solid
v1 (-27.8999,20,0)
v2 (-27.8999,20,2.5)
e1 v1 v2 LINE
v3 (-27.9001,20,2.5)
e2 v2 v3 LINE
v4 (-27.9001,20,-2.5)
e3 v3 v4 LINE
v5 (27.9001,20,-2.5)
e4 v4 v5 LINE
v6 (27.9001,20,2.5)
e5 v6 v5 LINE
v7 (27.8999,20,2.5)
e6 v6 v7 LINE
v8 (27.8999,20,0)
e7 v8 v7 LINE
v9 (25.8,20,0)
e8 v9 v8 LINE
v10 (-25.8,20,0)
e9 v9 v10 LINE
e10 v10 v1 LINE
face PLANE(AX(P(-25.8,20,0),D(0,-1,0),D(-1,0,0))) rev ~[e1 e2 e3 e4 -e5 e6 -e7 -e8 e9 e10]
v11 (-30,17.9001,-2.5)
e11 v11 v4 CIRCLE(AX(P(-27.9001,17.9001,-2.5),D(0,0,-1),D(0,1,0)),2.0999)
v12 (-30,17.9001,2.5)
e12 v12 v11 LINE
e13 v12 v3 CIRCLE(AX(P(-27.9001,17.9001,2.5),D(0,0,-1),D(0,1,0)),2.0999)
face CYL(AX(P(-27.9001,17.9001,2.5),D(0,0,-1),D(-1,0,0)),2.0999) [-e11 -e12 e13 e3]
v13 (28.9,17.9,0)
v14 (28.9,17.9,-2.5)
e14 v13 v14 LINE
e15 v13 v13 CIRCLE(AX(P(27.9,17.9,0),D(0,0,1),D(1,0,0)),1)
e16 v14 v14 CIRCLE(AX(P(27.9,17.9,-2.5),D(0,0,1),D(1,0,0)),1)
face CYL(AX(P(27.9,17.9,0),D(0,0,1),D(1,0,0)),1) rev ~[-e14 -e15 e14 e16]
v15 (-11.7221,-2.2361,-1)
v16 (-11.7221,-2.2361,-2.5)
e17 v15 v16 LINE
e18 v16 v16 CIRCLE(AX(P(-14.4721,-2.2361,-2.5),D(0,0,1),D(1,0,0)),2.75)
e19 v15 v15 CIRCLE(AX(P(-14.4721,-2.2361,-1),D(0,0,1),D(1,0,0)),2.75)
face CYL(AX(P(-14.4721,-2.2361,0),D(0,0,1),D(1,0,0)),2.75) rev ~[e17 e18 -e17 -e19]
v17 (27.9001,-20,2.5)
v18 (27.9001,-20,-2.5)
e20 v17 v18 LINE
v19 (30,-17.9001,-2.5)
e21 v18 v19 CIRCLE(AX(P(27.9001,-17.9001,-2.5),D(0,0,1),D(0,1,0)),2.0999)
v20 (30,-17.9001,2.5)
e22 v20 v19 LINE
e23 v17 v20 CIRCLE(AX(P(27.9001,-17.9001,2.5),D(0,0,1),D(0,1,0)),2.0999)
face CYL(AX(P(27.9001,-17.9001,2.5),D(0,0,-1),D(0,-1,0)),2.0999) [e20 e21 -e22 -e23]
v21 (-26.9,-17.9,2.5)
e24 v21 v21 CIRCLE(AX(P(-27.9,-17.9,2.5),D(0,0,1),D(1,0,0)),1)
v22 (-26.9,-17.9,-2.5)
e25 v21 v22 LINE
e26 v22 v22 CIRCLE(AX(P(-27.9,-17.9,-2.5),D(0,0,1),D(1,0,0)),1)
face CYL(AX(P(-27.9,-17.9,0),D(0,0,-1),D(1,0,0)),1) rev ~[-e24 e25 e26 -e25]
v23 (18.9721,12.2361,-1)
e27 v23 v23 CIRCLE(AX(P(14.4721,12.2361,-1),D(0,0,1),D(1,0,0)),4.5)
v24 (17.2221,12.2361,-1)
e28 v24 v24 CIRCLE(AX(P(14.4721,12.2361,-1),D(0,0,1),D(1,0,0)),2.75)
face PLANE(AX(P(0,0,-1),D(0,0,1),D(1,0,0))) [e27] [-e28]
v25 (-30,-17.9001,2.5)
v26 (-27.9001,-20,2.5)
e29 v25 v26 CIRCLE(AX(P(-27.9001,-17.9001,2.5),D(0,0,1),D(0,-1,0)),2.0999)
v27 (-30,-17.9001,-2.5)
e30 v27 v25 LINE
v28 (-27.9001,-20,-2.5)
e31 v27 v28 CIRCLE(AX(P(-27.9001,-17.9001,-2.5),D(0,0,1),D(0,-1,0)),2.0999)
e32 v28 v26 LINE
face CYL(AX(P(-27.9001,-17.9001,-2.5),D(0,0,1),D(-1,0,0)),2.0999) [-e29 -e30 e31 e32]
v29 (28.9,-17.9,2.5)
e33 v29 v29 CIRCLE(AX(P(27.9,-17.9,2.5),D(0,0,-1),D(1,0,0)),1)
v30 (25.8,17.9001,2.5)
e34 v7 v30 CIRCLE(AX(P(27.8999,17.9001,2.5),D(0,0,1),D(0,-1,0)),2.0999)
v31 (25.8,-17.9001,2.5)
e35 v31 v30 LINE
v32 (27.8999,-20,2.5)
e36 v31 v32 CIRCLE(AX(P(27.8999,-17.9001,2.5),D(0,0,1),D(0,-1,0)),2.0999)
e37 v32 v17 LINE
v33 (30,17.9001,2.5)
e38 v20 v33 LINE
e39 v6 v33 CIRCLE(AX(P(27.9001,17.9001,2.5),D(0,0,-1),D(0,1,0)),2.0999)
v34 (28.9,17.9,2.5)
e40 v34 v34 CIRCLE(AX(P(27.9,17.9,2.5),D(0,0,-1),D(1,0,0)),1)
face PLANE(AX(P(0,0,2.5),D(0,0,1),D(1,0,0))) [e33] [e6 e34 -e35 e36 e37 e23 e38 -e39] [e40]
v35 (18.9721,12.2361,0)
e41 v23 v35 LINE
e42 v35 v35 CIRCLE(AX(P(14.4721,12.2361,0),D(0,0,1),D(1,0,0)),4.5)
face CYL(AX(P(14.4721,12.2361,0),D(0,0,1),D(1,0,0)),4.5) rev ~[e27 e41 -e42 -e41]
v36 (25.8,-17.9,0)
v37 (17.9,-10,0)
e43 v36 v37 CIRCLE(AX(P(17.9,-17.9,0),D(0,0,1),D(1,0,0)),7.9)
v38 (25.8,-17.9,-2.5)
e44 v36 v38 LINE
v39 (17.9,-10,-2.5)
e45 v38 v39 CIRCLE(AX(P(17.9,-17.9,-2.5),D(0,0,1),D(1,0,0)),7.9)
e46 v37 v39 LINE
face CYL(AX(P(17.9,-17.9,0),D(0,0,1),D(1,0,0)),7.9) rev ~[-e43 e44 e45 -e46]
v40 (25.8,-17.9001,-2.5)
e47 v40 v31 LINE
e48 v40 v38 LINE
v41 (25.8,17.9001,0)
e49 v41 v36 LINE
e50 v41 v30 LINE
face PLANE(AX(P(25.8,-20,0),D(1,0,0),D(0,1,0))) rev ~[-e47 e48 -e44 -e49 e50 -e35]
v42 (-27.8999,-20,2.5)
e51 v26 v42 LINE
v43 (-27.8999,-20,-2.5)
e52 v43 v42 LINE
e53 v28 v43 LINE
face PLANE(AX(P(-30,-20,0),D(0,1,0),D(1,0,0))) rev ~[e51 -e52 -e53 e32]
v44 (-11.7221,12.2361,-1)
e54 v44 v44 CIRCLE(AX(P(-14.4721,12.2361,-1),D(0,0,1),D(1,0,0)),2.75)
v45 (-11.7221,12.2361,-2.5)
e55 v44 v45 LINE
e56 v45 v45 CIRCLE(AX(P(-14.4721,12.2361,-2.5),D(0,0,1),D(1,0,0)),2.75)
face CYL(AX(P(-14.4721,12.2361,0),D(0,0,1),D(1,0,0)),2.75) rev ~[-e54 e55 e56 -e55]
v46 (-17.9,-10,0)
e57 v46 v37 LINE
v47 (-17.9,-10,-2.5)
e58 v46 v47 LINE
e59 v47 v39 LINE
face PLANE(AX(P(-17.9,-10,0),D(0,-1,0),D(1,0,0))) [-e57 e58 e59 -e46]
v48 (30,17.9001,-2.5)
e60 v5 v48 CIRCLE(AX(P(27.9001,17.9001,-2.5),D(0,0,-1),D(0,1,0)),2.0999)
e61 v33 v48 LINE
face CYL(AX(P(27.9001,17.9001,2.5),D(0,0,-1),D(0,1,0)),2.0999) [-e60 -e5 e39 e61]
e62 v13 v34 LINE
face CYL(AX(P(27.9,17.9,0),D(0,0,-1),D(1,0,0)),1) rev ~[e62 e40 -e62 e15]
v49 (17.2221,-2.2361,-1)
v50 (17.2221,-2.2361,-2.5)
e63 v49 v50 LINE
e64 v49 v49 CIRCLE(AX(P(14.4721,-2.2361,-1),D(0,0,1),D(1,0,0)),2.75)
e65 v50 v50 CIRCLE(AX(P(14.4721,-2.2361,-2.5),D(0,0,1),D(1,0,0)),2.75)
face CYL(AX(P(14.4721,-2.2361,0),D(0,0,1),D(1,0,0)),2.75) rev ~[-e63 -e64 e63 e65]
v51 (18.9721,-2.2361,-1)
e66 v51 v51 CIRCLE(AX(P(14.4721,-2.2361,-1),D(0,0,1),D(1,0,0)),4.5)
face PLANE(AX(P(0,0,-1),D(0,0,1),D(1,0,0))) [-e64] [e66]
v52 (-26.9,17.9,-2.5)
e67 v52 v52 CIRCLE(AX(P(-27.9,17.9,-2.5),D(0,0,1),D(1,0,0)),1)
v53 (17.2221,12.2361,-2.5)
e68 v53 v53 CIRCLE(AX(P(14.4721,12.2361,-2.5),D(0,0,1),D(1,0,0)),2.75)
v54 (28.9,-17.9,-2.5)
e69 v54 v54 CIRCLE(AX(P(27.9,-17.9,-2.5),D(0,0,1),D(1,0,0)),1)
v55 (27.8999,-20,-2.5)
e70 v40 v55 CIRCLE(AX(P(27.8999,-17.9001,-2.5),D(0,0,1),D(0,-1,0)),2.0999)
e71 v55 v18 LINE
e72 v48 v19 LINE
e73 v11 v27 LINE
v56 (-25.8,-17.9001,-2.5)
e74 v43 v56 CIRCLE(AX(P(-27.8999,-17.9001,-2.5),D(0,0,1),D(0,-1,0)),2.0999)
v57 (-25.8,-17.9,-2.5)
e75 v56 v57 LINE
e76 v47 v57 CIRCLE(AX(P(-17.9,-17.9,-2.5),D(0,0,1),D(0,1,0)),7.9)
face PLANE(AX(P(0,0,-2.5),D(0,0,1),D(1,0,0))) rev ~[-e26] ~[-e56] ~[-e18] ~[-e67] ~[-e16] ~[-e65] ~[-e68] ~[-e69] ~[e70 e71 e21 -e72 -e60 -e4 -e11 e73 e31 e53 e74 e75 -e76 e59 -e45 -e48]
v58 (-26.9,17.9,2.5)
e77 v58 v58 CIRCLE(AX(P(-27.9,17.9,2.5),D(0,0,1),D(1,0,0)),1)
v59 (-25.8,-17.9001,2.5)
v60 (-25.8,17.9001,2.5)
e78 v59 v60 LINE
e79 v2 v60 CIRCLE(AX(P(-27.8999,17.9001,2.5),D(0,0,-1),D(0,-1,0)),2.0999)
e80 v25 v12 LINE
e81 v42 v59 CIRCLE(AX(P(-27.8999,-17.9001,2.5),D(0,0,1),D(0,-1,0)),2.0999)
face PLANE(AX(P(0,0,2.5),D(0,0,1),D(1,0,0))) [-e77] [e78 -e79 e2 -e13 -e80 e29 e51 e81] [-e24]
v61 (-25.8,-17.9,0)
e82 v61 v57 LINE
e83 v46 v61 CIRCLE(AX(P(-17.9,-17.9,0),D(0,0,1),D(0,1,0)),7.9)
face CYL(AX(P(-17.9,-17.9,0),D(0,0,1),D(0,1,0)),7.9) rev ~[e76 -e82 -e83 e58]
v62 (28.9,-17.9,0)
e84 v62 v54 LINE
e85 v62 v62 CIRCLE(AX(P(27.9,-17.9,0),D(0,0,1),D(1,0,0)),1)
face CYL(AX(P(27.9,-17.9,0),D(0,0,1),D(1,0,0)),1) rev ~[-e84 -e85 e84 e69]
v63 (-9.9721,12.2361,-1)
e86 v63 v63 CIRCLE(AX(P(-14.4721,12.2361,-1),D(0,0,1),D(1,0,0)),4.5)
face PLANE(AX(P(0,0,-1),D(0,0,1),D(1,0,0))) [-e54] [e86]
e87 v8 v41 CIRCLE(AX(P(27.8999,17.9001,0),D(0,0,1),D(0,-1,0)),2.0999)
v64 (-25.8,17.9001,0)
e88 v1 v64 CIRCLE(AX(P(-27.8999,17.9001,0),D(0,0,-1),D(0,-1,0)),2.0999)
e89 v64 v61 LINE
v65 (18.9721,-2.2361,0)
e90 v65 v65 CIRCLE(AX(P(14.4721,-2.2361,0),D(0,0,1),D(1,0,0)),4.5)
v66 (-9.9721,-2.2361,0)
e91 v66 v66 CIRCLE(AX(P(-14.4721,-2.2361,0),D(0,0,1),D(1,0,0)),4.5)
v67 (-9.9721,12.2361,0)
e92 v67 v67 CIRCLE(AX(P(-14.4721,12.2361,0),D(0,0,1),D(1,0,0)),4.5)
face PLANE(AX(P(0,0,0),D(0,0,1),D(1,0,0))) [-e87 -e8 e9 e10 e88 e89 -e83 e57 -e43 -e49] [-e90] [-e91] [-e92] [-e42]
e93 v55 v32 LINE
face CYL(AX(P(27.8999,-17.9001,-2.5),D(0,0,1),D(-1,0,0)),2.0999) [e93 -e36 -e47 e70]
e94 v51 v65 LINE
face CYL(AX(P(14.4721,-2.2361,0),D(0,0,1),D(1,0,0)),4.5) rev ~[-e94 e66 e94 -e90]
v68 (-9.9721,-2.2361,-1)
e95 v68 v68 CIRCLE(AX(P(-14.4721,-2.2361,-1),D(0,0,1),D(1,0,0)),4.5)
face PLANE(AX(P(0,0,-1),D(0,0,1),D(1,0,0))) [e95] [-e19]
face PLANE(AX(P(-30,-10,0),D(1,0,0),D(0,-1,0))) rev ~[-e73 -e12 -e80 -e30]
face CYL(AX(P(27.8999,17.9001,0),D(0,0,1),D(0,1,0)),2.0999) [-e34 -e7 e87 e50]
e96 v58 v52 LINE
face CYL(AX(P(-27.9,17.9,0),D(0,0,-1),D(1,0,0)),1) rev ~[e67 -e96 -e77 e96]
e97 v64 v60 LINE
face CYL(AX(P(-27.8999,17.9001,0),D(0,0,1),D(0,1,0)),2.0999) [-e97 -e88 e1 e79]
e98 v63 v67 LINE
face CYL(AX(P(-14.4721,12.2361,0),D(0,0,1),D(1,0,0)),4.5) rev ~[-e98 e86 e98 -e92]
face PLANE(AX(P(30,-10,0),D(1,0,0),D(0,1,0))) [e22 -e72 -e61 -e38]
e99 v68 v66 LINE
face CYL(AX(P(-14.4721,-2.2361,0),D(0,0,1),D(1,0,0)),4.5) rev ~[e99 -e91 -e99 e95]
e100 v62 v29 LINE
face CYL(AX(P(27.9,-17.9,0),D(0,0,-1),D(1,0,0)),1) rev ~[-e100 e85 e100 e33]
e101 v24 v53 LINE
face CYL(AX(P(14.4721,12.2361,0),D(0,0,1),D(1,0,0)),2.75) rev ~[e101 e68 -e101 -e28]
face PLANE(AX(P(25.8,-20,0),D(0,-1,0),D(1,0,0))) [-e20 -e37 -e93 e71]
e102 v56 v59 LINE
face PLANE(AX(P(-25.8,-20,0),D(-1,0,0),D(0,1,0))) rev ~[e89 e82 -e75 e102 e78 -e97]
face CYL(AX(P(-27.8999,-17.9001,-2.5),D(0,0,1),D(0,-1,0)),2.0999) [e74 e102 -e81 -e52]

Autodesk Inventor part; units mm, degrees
ref_plane "YZ Plane" through (0, 0, 0) normal (1, 0, 0) x (0, 1, 0)
ref_plane "XZ Plane" through (0, 0, 0) normal (0, 1, 0) x (-1, 0, 0)
ref_plane "XY Plane" through (0, 0, 0) normal (0, 0, 1) x (1, 0, 0)
sketch "Sketch1" plane through (0, 0, 0) normal (0, 0, 1) x (1, 0, 0)
  line L0 (-30, -20) -> (30, -20)
  line L1 (30, -20) -> (30, 20)
  line L2 (30, 20) -> (-30, 20)
  line L3 (-30, 20) -> (-30, -20)
  line L4 (-30, -20) -> (30, 20) construction
  line L5 (30, -20) -> (-30, 20) construction
  circle A0 centre (-27.9, 17.9) radius 2.1 construction
  circle A1 centre (-27.9, 17.9) radius 1
  line L6 (0, 0) -> (-34.17, 0) construction
  line L7 (0, 33.0444) -> (0, 0) construction
  circle A2 centre (-27.9, -17.9) radius 1
  circle A3 centre (27.9, 17.9) radius 1
  circle A4 centre (27.9, -17.9) radius 1
  line L8 (-25.8, -20) -> (-25.8, 20)
  line L9 (25.8, -20) -> (25.8, 20)
  line L10 (-27.9, 17.9) -> (27.9, 17.9)
  line L11 (27.9, -17.9) -> (-27.9, -17.9)
  circle A5 centre (-14.4721, 12.2361) radius 2.75
  circle A6 centre (-14.4721, 12.2361) radius 4.5
  circle A7 centre (-14.4721, 12.2361) radius 5 construction
  circle A8 centre (-10, 10) radius 2.5 construction
  line L12 (-34.3347, 5) -> (2.7365, 5) construction
  line L13 (-14.4721, 12.2361) -> (0, 5) construction
  circle A9 centre (-14.4721, -2.2361) radius 2.75
  circle A10 centre (-14.4721, -2.2361) radius 4.5
  circle A11 centre (14.4721, 12.2361) radius 2.75
  circle A12 centre (14.4721, 12.2361) radius 4.5
  circle A13 centre (14.4721, -2.2361) radius 2.75
  circle A14 centre (14.4721, -2.2361) radius 4.5
  line L14 (-30, -10) -> (30, -10)
  arc A15 (-17.9, -10) -> (-25.8, -17.9) centre (-17.9, -17.9) ccw
  arc A16 (25.8, -17.9) -> (17.9, -10) centre (17.9, -17.9) ccw
  point P0 (-25.8, 17.9)
  point P1 (25.8, 17.9)
  point P2 (25.8, 20)
  dimension "d0" = 60
  dimension "d1" = 40
  dimension "d2" = 1.1
  dimension "d3" = 2
  dimension "d8" = 9
  dimension "d9" = 5.5
  dimension "d10" = 10
  dimension "d20" = 5
  dimension "d22" = 5
  dimension "d25" = 10
  dimension "d26" = 10
  dimension "d27" = 5
extrude "Extrusion2" add sketch "Sketch1" along normal blind 2.5 contours L3 L14 L8 L0 | L3 L2 L8 L14 | L9 L14 L1 L0 | L14 L9 L2 L1
extrude "Extrusion3" add sketch "Sketch1" against normal blind 2.5 contours L3 L14 L8 L0 | L3 L2 L8 L14 | L9 L14 L1 L0 | L8 L14 A15 | L8 L10 L9 L14 | A16 L14 L9 | L2 L9 L10 L8 | L14 L9 L2 L1 | A6 | A10 | A12 | A14
extrude "Extrusion4" cut sketch "Sketch1" along normal blind 2.5 and the other way blind 1 contours A5 | A6 | A9 | A10 | A11 | A12 | A13 | A14
fillet "Fillet1" radius 2.1 8 edges at (-30, -20, 0) (-30, 20, 0) (30, -20, 0) (30, 20, 0) (-25.8, -20, 0) (-25.8, 20, 1.25) (25.8, 20, 1.25) (25.8, -20, 0)
properties part number "pcb"
